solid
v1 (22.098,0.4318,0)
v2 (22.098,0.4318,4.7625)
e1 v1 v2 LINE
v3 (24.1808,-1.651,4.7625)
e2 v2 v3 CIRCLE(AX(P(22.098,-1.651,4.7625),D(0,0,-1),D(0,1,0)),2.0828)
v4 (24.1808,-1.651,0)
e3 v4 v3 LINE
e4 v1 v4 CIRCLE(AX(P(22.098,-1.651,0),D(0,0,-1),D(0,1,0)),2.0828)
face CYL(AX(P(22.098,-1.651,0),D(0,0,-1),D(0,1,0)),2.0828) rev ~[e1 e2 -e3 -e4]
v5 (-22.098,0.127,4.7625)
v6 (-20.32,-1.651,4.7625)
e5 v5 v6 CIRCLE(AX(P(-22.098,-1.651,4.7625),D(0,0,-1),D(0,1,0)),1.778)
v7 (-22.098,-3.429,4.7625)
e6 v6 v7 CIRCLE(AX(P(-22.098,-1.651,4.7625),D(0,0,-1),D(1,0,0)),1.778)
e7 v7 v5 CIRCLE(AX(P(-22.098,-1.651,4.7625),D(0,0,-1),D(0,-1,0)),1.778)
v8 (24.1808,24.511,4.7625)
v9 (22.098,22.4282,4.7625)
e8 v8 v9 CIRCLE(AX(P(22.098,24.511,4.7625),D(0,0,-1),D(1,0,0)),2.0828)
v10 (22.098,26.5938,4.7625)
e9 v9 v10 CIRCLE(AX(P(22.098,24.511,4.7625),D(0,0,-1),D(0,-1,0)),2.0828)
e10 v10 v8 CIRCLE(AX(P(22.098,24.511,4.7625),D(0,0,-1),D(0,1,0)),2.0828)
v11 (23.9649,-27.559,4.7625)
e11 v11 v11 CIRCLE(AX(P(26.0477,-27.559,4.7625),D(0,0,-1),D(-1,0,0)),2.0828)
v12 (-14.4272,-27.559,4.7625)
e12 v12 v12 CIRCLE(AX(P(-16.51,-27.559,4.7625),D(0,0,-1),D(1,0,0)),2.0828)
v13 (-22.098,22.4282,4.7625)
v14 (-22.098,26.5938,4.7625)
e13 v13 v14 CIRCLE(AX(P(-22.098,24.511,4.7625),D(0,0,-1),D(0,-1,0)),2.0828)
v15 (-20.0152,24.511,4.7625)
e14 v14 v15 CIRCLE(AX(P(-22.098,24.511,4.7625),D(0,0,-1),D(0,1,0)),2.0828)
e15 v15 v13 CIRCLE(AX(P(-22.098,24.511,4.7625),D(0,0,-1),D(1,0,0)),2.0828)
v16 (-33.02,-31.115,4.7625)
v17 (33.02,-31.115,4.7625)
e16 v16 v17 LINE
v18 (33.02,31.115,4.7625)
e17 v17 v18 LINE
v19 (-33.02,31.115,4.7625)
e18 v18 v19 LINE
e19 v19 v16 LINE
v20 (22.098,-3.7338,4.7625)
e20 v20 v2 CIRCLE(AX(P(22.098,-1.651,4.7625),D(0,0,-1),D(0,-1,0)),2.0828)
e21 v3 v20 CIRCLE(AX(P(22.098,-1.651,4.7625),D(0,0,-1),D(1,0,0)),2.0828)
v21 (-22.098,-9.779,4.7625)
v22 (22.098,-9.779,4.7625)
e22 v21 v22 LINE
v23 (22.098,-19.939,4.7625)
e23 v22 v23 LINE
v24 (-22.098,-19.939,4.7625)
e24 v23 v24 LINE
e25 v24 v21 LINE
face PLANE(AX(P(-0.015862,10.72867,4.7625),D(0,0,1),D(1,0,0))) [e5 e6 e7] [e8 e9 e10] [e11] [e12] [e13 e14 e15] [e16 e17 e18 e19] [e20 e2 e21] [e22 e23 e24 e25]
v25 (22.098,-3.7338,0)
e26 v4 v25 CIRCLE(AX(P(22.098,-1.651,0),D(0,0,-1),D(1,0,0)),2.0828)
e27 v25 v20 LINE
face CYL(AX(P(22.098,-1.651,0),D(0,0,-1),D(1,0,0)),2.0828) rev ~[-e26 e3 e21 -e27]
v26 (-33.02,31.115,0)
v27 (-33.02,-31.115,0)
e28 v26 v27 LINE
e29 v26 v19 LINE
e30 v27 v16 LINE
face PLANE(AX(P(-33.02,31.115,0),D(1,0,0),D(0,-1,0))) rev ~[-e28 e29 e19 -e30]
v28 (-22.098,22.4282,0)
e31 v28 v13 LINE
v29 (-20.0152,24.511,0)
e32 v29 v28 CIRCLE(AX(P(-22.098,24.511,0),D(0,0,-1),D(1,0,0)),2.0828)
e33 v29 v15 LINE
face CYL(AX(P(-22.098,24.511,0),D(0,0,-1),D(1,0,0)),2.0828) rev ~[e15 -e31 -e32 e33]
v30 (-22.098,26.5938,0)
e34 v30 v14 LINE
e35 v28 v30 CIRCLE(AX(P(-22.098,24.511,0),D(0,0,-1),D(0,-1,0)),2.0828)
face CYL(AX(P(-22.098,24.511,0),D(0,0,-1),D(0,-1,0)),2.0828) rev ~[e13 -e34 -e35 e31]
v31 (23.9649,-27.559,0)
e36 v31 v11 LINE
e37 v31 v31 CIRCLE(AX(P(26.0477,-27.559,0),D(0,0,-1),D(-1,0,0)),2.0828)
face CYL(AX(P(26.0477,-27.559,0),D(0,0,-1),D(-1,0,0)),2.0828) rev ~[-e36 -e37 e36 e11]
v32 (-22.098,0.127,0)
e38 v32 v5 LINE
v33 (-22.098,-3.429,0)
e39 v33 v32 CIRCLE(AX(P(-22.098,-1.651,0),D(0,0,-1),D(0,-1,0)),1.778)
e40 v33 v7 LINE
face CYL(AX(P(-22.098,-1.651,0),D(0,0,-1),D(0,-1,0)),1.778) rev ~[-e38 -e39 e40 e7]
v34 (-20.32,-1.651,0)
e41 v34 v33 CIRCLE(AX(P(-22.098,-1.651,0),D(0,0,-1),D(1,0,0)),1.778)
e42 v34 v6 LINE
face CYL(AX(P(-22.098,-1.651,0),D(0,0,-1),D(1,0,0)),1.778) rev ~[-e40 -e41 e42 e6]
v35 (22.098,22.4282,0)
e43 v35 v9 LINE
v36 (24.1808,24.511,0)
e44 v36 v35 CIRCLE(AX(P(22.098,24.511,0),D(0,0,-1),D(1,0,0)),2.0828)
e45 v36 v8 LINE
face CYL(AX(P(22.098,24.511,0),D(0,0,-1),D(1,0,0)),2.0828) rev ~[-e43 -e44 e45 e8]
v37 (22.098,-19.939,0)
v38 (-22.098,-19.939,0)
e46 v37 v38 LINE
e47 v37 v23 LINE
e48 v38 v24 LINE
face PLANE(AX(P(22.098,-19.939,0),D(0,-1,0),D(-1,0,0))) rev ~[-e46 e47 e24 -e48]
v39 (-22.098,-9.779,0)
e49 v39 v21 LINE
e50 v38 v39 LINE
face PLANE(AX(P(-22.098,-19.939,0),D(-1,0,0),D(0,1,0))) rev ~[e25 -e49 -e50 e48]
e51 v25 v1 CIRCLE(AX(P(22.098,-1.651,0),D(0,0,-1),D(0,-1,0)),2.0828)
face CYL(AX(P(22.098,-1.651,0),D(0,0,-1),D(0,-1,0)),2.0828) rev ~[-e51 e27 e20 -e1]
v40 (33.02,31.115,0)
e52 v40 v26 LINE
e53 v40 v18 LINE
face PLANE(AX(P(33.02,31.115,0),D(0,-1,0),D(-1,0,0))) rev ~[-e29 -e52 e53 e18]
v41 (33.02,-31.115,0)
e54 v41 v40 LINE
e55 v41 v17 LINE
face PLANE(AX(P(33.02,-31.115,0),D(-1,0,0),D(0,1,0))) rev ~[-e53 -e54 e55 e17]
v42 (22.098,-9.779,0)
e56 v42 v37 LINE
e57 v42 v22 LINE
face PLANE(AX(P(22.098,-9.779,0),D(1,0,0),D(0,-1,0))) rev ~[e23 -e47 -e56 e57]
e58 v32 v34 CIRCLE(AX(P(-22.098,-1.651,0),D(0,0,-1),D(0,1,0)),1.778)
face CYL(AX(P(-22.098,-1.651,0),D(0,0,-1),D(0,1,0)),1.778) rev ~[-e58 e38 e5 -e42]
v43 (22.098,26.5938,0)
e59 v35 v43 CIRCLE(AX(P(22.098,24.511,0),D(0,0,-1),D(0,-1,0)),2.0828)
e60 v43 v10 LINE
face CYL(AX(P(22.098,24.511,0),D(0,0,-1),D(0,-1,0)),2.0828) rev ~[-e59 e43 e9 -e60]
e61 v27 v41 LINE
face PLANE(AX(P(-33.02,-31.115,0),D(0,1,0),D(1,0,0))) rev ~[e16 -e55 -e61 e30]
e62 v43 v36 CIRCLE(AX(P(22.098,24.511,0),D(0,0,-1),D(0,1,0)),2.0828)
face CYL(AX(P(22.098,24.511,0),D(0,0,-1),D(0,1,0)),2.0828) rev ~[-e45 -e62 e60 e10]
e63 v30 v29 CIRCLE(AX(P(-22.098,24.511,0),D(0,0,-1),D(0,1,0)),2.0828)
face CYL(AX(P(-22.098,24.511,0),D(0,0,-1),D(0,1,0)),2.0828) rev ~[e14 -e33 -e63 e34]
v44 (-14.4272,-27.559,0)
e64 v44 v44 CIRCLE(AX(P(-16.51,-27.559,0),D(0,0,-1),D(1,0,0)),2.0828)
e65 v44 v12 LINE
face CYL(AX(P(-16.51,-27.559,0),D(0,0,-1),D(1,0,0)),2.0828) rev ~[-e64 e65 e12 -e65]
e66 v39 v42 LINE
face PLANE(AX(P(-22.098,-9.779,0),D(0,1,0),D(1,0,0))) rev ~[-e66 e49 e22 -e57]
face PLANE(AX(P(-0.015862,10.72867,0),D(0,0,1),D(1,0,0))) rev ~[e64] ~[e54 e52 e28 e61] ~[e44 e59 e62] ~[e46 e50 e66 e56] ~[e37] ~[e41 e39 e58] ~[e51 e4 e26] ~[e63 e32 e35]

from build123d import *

# Parameters (mm, degrees)
F1_DEPTH = 4.7625


# Not quite as in the source:
# - a length typed as a fraction of an inch, garbled in the dataset ("3 / 203.2 mm" for 3/8 in), is restored


with BuildPart() as f1:
    # F0 (on Top) → F1 (new body)
    with BuildSketch(Plane.XY):
        with BuildLine():
            Line((22.098, 26.5938), (22.098, 31.115))
            Line((22.098, 31.115), (0, 31.115))
            Line((0, 31.115), (-22.098, 31.115))
            Line((-22.098, 31.115), (-22.098, 26.5938))
            ThreePointArc((-22.098, 26.5938), (-20.6252379961, 25.9837620039), (-20.0152, 24.511))
            ThreePointArc((-20.0152, 24.511), (-20.6252379961, 23.0382379961), (-22.098, 22.4282))
            Line((-22.098, 22.4282), (-22.098, 0.127))
            ThreePointArc((-22.098, 0.127), (-20.8407641431, -0.3937641431), (-20.32, -1.651))
            ThreePointArc((-20.32, -1.651), (-20.8407641431, -2.9082358569), (-22.098, -3.429))
            Line((-22.098, -3.429), (-22.098, -9.779))
            Line((-22.098, -9.779), (22.098, -9.779))
            Line((22.098, -9.779), (22.098, -3.7338))
            ThreePointArc((22.098, -3.7338), (20.0152, -1.651), (22.098, 0.4318))
            Line((22.098, 0.4318), (22.098, 22.4282))
            ThreePointArc((22.098, 22.4282), (20.0152, 24.511), (22.098, 26.5938))
        make_face()
        with BuildLine():
            Line((-22.098, 26.5938), (-22.098, 31.115))
            Line((-22.098, 31.115), (-33.02, 31.115))
            Line((-33.02, 31.115), (-33.02, -31.115))
            Line((-33.02, -31.115), (-22.098, -31.115))
            Line((-22.098, -31.115), (-22.098, -27.559))
            Line((-22.098, -27.559), (-22.098, -19.939))
            Line((-22.098, -19.939), (-22.098, -9.779))
            Line((-22.098, -9.779), (-22.098, -3.429))
            ThreePointArc((-22.098, -3.429), (-23.876, -1.651), (-22.098, 0.127))
            Line((-22.098, 0.127), (-22.098, 22.4282))
            ThreePointArc((-22.098, 22.4282), (-24.1808, 24.511), (-22.098, 26.5938))
        make_face()
        with BuildLine():
            Line((33.02, -27.559), (33.02, 31.115))
            Line((33.02, 31.115), (22.098, 31.115))
            Line((22.098, 31.115), (22.098, 26.5938))
            ThreePointArc((22.098, 26.5938), (23.5707620039, 25.9837620039), (24.1808, 24.511))
            ThreePointArc((24.1808, 24.511), (23.5707620039, 23.0382379961), (22.098, 22.4282))
            Line((22.098, 22.4282), (22.098, 0.4318))
            ThreePointArc((22.098, 0.4318), (23.5707620039, -0.1782379961), (24.1808, -1.651))
            ThreePointArc((24.1808, -1.651), (23.5707620039, -3.1237620039), (22.098, -3.7338))
            Line((22.098, -3.7338), (22.098, -9.779))
            Line((22.098, -9.779), (22.098, -19.939))
            Line((22.098, -19.939), (22.098, -27.559))
            Line((22.098, -27.559), (23.9649, -27.559))
            ThreePointArc((23.9649, -27.559), (26.0477, -25.4762), (28.1305, -27.559))
            Line((28.1305, -27.559), (33.02, -27.559))
        make_face()
        with BuildLine():
            Line((33.02, -31.115), (33.02, -27.559))
            Line((33.02, -27.559), (28.1305, -27.559))
            ThreePointArc((28.1305, -27.559), (26.0477, -29.6418), (23.9649, -27.559))
            Line((23.9649, -27.559), (22.098, -27.559))
            Line((22.098, -27.559), (22.098, -31.115))
            Line((22.098, -31.115), (33.02, -31.115))
        make_face()
        with BuildLine():
            Line((-14.4272, -27.559), (22.098, -27.559))
            Line((22.098, -27.559), (22.098, -19.939))
            Line((22.098, -19.939), (-22.098, -19.939))
            Line((-22.098, -19.939), (-22.098, -27.559))
            Line((-22.098, -27.559), (-18.5928, -27.559))
            ThreePointArc((-18.5928, -27.559), (-16.51, -25.4762), (-14.4272, -27.559))
        make_face()
        with BuildLine():
            Line((-22.098, -31.115), (22.098, -31.115))
            Line((22.098, -31.115), (22.098, -27.559))
            Line((22.098, -27.559), (-14.4272, -27.559))
            ThreePointArc((-14.4272, -27.559), (-16.51, -29.6418), (-18.5928, -27.559))
            Line((-18.5928, -27.559), (-22.098, -27.559))
            Line((-22.098, -27.559), (-22.098, -31.115))
        make_face()
    extrude(amount=F1_DEPTH)


solid = f1.part
